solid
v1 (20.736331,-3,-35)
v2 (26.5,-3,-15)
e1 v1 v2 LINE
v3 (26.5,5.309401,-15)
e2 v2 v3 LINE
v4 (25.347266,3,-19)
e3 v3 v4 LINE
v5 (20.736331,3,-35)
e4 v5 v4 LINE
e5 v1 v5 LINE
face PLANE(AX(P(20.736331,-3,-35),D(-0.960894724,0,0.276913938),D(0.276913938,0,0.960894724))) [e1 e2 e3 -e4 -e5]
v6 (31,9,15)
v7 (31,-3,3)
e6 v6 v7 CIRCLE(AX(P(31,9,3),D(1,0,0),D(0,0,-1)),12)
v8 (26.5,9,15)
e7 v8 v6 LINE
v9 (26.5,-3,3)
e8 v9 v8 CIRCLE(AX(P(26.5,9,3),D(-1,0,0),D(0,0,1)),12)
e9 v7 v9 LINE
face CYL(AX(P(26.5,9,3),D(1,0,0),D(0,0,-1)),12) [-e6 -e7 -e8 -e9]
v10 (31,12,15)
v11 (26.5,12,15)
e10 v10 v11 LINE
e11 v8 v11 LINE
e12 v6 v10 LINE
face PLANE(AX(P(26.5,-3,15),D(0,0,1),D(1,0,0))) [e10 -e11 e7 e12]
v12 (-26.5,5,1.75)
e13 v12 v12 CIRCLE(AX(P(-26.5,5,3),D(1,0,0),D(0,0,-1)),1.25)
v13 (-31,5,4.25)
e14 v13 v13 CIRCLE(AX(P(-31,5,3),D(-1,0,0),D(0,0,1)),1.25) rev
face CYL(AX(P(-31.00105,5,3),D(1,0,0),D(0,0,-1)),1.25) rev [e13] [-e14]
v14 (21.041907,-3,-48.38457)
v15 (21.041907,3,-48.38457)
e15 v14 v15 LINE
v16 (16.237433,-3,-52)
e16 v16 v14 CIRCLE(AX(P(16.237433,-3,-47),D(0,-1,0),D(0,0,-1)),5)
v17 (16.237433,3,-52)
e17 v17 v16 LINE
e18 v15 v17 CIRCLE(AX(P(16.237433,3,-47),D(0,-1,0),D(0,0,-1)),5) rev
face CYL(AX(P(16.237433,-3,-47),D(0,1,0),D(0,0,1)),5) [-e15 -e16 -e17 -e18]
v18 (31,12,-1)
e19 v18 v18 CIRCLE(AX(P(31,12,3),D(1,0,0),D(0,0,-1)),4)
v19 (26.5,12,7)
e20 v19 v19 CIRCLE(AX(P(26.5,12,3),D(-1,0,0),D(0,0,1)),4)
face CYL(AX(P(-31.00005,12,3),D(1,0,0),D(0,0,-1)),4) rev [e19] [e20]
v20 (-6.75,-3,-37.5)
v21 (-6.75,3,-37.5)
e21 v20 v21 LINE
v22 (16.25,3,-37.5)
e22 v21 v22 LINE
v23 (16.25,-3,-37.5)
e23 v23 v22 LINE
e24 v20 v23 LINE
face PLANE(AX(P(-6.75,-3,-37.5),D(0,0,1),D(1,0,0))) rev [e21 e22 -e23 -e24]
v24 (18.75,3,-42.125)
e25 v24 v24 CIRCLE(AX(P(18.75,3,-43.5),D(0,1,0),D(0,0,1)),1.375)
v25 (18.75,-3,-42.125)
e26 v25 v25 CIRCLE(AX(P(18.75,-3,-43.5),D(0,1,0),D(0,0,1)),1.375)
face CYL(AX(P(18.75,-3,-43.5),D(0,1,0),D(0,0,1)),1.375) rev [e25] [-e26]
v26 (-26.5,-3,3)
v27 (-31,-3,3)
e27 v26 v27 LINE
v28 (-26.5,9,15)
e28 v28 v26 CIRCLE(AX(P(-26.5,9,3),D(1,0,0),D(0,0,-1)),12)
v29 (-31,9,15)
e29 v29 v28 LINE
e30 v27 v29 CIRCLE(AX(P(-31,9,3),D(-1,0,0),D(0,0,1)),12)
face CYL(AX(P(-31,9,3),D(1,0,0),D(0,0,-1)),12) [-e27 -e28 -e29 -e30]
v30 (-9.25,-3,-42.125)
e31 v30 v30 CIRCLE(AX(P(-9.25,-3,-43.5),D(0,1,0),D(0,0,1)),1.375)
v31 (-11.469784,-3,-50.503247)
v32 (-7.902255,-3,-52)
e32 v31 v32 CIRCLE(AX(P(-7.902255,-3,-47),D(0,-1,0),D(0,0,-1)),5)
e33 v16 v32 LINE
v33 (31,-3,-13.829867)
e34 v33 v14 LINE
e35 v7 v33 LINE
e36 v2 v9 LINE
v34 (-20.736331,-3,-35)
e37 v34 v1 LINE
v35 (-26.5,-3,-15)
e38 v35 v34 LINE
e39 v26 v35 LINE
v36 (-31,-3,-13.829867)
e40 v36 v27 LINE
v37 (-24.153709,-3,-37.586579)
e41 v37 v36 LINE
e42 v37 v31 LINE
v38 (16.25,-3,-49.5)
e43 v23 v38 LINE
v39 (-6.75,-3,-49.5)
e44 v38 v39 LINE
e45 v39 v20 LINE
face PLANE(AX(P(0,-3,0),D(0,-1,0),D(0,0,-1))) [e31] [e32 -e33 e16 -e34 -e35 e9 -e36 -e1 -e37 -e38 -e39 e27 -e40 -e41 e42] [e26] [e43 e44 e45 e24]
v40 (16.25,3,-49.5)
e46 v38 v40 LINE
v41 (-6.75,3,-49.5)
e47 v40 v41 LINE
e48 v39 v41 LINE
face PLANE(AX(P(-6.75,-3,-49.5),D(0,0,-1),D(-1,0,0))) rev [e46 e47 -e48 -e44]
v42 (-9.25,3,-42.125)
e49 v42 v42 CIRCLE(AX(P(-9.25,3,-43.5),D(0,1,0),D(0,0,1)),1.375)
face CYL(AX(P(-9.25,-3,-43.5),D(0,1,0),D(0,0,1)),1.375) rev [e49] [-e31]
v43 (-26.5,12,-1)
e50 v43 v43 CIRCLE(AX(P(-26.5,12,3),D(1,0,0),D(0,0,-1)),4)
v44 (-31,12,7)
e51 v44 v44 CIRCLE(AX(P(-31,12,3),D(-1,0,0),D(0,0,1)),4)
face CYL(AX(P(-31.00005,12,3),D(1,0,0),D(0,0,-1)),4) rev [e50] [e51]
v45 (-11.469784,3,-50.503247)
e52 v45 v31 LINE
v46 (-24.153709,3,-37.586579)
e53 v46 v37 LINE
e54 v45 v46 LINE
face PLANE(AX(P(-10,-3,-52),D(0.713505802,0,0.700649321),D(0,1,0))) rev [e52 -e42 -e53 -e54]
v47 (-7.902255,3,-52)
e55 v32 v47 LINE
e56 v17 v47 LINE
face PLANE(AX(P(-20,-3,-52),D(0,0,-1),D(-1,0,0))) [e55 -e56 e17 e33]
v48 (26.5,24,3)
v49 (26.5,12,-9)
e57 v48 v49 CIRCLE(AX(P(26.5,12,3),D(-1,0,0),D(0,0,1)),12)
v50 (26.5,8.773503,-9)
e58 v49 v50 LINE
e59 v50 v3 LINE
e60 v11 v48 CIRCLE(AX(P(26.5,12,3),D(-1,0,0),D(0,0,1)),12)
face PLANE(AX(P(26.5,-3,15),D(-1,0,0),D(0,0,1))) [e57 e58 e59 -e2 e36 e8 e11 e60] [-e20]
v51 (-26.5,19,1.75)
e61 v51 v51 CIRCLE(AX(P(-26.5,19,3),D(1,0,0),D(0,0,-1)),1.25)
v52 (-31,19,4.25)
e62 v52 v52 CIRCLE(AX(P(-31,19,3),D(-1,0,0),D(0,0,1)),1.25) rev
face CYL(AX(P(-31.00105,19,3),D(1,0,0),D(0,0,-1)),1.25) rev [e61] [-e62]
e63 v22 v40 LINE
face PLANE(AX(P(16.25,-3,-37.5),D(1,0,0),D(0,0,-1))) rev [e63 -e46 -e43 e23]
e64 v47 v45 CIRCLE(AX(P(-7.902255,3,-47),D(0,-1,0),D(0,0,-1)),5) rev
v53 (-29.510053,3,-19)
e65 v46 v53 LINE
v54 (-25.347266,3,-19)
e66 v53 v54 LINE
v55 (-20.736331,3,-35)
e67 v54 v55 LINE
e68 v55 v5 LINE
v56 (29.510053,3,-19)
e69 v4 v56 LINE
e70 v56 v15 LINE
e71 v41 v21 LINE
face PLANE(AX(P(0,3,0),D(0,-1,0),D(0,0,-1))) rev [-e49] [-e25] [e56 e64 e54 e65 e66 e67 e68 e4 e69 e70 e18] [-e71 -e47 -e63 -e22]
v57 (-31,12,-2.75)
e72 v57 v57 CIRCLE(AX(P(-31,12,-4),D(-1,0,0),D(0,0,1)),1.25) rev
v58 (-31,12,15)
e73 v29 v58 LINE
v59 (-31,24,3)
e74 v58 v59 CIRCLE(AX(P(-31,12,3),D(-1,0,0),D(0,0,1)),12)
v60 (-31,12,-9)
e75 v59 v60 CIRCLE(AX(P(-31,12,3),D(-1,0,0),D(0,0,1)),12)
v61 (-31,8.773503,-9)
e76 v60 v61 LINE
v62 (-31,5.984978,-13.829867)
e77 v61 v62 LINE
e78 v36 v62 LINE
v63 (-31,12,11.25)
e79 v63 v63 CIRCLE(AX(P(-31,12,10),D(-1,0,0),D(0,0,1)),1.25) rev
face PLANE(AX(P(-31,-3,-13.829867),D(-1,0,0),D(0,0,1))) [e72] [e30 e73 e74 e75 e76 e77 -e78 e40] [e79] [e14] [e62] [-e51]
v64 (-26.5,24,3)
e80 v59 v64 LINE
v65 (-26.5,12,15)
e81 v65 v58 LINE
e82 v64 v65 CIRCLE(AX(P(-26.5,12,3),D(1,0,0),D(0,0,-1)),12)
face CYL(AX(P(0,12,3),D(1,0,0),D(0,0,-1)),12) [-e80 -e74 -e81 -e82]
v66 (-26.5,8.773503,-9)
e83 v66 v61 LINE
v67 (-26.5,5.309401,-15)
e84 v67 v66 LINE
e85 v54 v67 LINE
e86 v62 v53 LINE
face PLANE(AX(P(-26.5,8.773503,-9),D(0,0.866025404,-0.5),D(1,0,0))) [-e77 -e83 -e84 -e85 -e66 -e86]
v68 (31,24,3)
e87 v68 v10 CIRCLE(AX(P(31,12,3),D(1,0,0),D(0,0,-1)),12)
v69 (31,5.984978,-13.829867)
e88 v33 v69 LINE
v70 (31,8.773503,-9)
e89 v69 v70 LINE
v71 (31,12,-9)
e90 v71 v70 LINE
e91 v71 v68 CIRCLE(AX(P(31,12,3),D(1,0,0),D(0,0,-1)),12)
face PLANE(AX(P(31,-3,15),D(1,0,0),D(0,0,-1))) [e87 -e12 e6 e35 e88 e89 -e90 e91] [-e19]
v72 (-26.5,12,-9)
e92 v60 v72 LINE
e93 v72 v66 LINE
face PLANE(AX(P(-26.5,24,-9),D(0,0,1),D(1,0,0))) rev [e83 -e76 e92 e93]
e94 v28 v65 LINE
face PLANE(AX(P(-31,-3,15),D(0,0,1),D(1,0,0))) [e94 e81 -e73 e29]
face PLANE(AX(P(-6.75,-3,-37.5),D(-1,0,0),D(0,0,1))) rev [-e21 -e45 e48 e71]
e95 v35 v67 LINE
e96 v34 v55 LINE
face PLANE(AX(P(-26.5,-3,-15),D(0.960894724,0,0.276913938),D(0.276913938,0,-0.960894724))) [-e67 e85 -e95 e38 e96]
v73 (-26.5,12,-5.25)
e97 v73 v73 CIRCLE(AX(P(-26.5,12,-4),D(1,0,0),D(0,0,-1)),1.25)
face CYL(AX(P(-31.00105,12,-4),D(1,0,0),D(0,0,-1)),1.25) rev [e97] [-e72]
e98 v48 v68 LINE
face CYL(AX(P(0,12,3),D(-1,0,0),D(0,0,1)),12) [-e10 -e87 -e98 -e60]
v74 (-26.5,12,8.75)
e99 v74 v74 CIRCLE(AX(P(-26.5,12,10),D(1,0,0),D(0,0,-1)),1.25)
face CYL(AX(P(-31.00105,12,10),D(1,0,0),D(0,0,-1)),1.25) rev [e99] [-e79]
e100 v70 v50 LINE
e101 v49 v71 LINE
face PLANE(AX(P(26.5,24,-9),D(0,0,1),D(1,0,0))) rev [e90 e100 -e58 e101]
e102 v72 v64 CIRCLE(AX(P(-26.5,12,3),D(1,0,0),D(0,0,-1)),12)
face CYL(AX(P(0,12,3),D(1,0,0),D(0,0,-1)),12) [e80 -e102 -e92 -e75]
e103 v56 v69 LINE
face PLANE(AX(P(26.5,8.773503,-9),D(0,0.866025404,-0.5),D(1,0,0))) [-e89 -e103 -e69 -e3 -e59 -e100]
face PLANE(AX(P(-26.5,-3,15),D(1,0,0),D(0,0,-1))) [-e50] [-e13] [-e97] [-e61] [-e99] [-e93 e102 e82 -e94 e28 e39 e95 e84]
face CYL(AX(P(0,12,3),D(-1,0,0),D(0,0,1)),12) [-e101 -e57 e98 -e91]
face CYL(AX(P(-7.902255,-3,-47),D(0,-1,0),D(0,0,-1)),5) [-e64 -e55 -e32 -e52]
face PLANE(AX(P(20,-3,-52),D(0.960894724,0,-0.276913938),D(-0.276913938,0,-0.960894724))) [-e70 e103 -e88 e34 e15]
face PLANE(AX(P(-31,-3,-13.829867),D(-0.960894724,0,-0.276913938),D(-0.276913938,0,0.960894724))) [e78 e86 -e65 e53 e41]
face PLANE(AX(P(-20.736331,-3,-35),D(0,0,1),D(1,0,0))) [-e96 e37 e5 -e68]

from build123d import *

# Parameters (mm, degrees)
BOSS_EXTRUDE1_DEPTH      = 3
BOSS_EXTRUDE1_DEPTH_BACK = 3
SKETCH1_R                = 1.375
SKETCH1_W                = 23
SKETCH1_H                = 12
SKETCH2_W                = 4.5
SKETCH2_H                = 24
BOSS_EXTRUDE2_DEPTH      = 21
CUT_EXTRUDE3_START       = -4.5
CUT_EXTRUDE3_OUTLINE_R   = 1.25
CUT_EXTRUDE3_DEPTH       = 4.5
CUT_EXTRUDE4_DEPTH       = 82.155714525
CUT_EXTRUDE4_DEPTH_BACK  = 82.155714525
SKETCH8_R                = 4
FILLET1_R                = 12
CHAMFER2_SIZE            = 10
CHAMFER2_SIZE2           = 5.773502692
CHAMFER3_SIZE            = 15
CHAMFER3_SIZE2           = 10
FILLET2_R                = 5


# Read off the part's stored shape, not the designer's step: Cut-Extrude3
with BuildPart() as part:
    # Sketch1 → Boss-Extrude1 (new, two sides: drawn at the far end of the back side and taken through both)
    with BuildSketch(Plane(origin=(0, 0, 0), x_dir=(1, 0, 0), z_dir=(0, 1, 0)).offset(-BOSS_EXTRUDE1_DEPTH_BACK)):
        Polygon((-31, 13.829866561), (-31, -15), (-26.5, -15), (-26.5, 15), (-20.736331389, 35), (20.736331389, 35), (26.5, 15), (26.5, -15), (31, -15), (31, 13.829866561), (20, 52), (-20, 52), align=None)
        with Locations(Location((18.75, 43.5, 0), (0, 0, 270))):
            Circle(SKETCH1_R, mode=Mode.SUBTRACT)
        with Locations(Location((-9.25, 43.5, 0), (0, 0, 270))):
            Circle(SKETCH1_R, mode=Mode.SUBTRACT)
        with Locations((4.75, 43.5)):
            Rectangle(SKETCH1_W, SKETCH1_H, mode=Mode.SUBTRACT)
    extrude(amount=BOSS_EXTRUDE1_DEPTH + BOSS_EXTRUDE1_DEPTH_BACK)

    # Sketch2 → Boss-Extrude2 (add)
    with BuildSketch(Plane(origin=(0, 3, 0), x_dir=(1, 0, 0), z_dir=(0, 1, 0))):
        with Locations((-28.75, -3)):
            Rectangle(SKETCH2_W, SKETCH2_H)
        with Locations((28.75, -3)):
            Rectangle(SKETCH2_W, SKETCH2_H)
    extrude(amount=BOSS_EXTRUDE2_DEPTH)

    # Cut-Extrude3 outline → Cut-Extrude3 (cut)
    with BuildSketch(Plane(origin=(-26.5, 0, 0), x_dir=(0, 0, -1), z_dir=(1, 0, 0)).offset(CUT_EXTRUDE3_START)):
        with Locations((-3, 19)):
            Circle(CUT_EXTRUDE3_OUTLINE_R)
        with Locations((4, 12)):
            Circle(CUT_EXTRUDE3_OUTLINE_R)
        with Locations((-3, 5)):
            Circle(CUT_EXTRUDE3_OUTLINE_R)
        with Locations((-10, 12)):
            Circle(CUT_EXTRUDE3_OUTLINE_R)
    extrude(amount=CUT_EXTRUDE3_DEPTH, mode=Mode.SUBTRACT)

    # Sketch8 → Cut-Extrude4 (cut, two sides: drawn at the far end of the back side and taken through both)
    with BuildSketch(Plane(origin=(-26.5, 0, 0), x_dir=(0, 0, -1), z_dir=(1, 0, 0)).offset(-CUT_EXTRUDE4_DEPTH_BACK)):
        with Locations((-3, 12)):
            Circle(SKETCH8_R)
    extrude(amount=CUT_EXTRUDE4_DEPTH + CUT_EXTRUDE4_DEPTH_BACK, mode=Mode.SUBTRACT)

    # Fillet1
    fillet1_edges = [part.edges().sort_by_distance(p)[0] for p in [
        (28.75, -3, 15),
        (-28.75, -3, 15),
        (-28.75, 24, -9),
        (28.75, 24, -9),
        (28.75, 24, 15),
        (-28.75, 24, 15),
    ]]
    fillet(fillet1_edges, radius=FILLET1_R - 0.0001)  # a hair under: the kernel refuses the full size

    # Chamfer2
    chamfer2_edges = [part.edges().sort_by_distance(p)[0] for p in [
        (-28.75, 3, -9),
        (28.75, 3, -9),
    ]]
    chamfer2_side = [part.faces().sort_by_distance(p)[0] for p in [
        (-1.966040558, 3, -36.302482854),
    ]]
    chamfer(chamfer2_edges, length=CHAMFER2_SIZE, length2=CHAMFER2_SIZE2, reference=chamfer2_side[0])

    # Chamfer3
    chamfer3_edges = [part.edges().sort_by_distance(p)[0] for p in [
        (-20, 0, -52),
    ]]
    chamfer3_side = [part.faces().sort_by_distance(p)[0] for p in [
        (-25.663082519, 0.130215421, -32.349034961),
    ]]
    chamfer(chamfer3_edges, length=CHAMFER3_SIZE, length2=CHAMFER3_SIZE2, reference=chamfer3_side[0])

    # Fillet2
    fillet2_edges = [part.edges().sort_by_distance(p)[0] for p in [
        (20, 0, -52),
        (-10, 0, -52),
    ]]
    fillet(fillet2_edges, radius=FILLET2_R)


solid = part.part
